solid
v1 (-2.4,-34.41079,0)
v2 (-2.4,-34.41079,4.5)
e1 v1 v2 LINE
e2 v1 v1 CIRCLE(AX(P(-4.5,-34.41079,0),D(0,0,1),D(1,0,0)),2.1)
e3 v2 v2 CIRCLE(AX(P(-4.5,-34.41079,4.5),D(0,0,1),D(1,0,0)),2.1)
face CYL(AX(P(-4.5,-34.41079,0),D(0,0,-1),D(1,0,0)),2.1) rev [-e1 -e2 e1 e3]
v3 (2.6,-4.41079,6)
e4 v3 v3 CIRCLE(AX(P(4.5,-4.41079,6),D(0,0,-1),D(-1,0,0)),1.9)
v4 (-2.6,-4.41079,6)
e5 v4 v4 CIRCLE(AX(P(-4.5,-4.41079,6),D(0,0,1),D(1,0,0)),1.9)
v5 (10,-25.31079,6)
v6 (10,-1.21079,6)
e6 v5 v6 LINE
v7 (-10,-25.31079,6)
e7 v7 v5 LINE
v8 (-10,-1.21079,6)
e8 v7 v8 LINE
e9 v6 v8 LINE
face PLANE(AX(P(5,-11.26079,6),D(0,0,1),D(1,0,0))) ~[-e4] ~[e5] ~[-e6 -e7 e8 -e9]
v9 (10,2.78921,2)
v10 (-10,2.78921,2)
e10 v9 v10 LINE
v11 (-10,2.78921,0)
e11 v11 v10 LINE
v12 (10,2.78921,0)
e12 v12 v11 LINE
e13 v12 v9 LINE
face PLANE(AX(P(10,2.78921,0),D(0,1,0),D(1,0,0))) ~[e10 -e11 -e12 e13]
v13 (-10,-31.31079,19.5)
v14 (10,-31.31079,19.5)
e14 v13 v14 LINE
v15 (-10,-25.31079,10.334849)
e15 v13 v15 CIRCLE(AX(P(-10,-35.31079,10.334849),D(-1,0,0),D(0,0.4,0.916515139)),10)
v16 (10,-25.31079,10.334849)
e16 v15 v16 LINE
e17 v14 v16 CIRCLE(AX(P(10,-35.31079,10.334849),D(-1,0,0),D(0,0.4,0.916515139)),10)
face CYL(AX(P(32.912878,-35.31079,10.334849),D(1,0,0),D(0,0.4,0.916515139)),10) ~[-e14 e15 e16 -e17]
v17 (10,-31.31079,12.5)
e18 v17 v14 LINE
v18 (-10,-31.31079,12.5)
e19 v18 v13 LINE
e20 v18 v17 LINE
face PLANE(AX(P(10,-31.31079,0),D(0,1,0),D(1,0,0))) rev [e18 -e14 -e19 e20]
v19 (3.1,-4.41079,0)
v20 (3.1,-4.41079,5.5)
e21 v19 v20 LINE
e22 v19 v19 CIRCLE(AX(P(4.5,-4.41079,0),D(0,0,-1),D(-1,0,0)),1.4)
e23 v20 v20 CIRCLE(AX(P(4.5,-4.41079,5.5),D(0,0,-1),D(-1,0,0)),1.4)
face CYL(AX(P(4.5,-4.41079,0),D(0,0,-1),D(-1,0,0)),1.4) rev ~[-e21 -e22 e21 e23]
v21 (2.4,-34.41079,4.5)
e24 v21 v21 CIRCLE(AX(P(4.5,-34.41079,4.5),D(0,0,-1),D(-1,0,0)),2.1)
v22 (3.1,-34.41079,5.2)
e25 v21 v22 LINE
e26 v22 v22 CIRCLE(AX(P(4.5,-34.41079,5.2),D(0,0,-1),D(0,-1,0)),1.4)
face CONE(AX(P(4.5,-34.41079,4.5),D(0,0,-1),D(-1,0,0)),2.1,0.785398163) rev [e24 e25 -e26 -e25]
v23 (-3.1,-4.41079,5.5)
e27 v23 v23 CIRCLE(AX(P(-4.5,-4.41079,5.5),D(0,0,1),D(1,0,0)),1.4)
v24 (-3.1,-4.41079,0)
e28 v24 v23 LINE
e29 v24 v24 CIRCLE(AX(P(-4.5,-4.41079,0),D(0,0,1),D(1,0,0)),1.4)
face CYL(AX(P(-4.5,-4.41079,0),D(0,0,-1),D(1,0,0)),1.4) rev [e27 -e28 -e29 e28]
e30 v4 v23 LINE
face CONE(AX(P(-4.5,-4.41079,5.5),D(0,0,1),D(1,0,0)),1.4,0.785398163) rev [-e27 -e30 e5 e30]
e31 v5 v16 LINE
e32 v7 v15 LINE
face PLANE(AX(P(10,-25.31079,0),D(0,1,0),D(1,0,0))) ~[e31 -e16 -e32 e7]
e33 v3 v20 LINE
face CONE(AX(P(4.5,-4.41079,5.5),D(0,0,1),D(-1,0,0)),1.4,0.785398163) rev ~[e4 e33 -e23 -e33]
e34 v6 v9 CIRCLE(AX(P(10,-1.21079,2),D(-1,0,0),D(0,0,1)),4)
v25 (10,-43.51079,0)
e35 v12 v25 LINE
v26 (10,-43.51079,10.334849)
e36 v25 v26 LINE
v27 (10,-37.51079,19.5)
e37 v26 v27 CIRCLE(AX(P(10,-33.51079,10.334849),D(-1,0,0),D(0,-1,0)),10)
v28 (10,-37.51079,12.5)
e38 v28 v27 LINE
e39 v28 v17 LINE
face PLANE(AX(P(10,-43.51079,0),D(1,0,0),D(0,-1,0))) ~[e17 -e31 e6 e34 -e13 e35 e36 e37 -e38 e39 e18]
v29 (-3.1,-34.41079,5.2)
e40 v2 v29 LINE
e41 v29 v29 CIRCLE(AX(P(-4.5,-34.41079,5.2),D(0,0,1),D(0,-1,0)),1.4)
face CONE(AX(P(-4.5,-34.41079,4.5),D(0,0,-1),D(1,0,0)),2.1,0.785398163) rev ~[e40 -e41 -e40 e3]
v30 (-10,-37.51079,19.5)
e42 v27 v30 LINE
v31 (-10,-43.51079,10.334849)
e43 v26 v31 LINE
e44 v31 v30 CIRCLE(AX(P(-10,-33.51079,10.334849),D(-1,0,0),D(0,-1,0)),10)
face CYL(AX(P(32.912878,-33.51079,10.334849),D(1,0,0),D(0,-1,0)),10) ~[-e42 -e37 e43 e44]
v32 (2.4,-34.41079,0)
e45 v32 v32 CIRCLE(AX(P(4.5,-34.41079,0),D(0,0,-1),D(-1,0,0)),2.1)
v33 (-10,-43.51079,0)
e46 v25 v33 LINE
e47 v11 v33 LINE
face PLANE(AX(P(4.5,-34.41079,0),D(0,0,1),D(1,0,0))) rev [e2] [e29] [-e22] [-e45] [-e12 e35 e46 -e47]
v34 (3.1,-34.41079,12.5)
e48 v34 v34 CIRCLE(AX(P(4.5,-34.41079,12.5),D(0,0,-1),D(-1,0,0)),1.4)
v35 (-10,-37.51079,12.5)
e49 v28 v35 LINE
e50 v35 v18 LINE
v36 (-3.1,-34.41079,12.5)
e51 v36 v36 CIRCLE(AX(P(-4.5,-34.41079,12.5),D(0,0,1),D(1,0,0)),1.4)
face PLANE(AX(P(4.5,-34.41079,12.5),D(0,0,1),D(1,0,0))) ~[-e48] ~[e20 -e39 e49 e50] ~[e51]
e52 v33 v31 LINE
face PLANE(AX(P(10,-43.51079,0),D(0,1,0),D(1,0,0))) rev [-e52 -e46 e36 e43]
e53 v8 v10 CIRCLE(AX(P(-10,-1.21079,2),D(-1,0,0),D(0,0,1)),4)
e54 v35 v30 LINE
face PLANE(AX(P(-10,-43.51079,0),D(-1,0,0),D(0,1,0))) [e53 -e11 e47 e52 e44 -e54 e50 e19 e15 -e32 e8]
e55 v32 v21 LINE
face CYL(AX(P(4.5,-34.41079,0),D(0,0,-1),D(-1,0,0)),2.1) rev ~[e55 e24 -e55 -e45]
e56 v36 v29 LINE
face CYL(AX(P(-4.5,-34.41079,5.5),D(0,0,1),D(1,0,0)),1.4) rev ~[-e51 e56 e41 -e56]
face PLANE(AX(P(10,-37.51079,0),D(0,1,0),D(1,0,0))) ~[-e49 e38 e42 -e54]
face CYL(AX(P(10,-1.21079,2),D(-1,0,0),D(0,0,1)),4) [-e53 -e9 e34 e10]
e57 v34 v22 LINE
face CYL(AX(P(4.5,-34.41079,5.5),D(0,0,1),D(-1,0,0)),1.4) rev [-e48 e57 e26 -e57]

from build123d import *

# Parameters (mm, degrees)
F0_W        = 10
F0_H        = 28.1
F0_R        = 1.4
F1_DEPTH    = 6
F0_H_2      = 6
F2_DEPTH    = 19.5
F0_H_3      = 6.2
F0_R_2      = 2.1
F3_DEPTH    = 12.5
F4_DEPTH    = 19.5
F5_DEPTH    = 12.5
F6_DEPTH    = 6.5
F7_T1_DEPTH = 55.8257569496
F8_S5_R     = 1.4
F8_T6_DEPTH = 5
F9_R        = 4
F10_SIZE    = 0.5


# Not quite as in the source:
# - a fillet or chamfer that OpenCascade refuses, or shapes differently, is made with other operations: its cross-section is extruded or revolved along the edge and cut away or added


with BuildPart() as f1:
    # F0 (on Top) → F1 (new body)
    with BuildSketch(Plane.XY):
        with Locations((-5, -11.2607904853)):
            Rectangle(F0_W, F0_H)
        with Locations((-4.5, -4.4107904853)):
            Circle(F0_R, mode=Mode.SUBTRACT)
    extrude(amount=F1_DEPTH)

    # F0 (on Top) → F2 (join)
    with BuildSketch(Plane.XY):
        with Locations((-5, -28.3107904853)):
            Rectangle(F0_W, F0_H_2)
    extrude(amount=F2_DEPTH)

    # F0 (on Top) → F3 (join)
    with BuildSketch(Plane.XY):
        with Locations((-5, -34.4107904853)):
            Rectangle(F0_W, F0_H_3)
        with Locations((-4.5, -34.4107904853)):
            Circle(F0_R_2, mode=Mode.SUBTRACT)
    extrude(amount=F3_DEPTH)

    # F0 (on Top) → F4 (join)
    with BuildSketch(Plane.XY):
        with Locations((-5, -40.5107904853)):
            Rectangle(F0_W, F0_H_2)
    extrude(amount=F4_DEPTH)

    # F0 (on Top) → F5 (join)
    with BuildSketch(Plane.XY):
        with Locations((-4.5, -34.4107904853)):
            Circle(F0_R_2)
        with Locations((-4.5, -34.4107904853)):
            Circle(F0_R, mode=Mode.SUBTRACT)
    extrude(amount=F5_DEPTH)

    # F0 (on Top) → F6 (cut)
    with BuildSketch(Plane.XY):
        with Locations((-4.5, -34.4107904853)):
            Circle(F0_R_2)
        with Locations((-4.5, -34.4107904853)):
            Circle(F0_R, mode=Mode.SUBTRACT)
    extrude(amount=F6_DEPTH, mode=Mode.SUBTRACT)

    # F7: fillet of radius 10 on 2 edges, made by hand

    # F7_s2 → F7_t1 (cut)
    with BuildSketch(Plane.YZ.offset(-32.9128784748)):
        with BuildLine():
            ThreePointArc((-31.3107904853, 19.5), (-26.9441902199, 15.8120741851), (-25.3107904853, 10.3348486101))
            Line((-25.3107904853, 10.3348486101), (-25.3107904853, 19.5))
            Line((-25.3107904853, 19.5), (-31.3107904853, 19.5))
        make_face()
        with BuildLine():
            ThreePointArc((-43.5107904853, 10.3348486101), (-41.8773907506, 15.8120741851), (-37.5107904853, 19.5))
            Line((-37.5107904853, 19.5), (-43.5107904853, 19.5))
            Line((-43.5107904853, 19.5), (-43.5107904853, 10.3348486101))
        make_face()
    extrude(amount=F7_T1_DEPTH, mode=Mode.SUBTRACT)

    # F8: chamfer of 2 on 1 edges, made by hand


with BuildPart() as f8_tool2:
    # F8_s3 → F8_t4 (revolve)
    with BuildSketch(Plane.XZ.offset(34.4107904853)):
        Polygon((-2.4, 4.5), (-4.4, 6.5), (-2.4, 6.5), align=None)
    revolve(axis=Axis((-4.5, -34.4107904853, 6.5), (0, 0, 1)))

    # F8_s5 → F8_t6 (cut, symmetric)
    with BuildSketch(Plane.XY.offset(5.5)):
        with Locations((-4.5, -34.4107904853)):
            Circle(F8_S5_R)
    extrude(amount=F8_T6_DEPTH, both=True, mode=Mode.SUBTRACT)


with BuildPart() as f1_1:
    add(f1.part)

    # F8_t1: union F8_tool2
    add(f8_tool2.part)

    # F9
    f9_edges = [f1_1.edges().sort_by_distance(p)[0] for p in [
        (-5, 2.78921, 6),
    ]]
    fillet(f9_edges, radius=F9_R)

    # F10
    f10_edges = [f1_1.edges().sort_by_distance(p)[0] for p in [
        (-5.9, -4.41079, 6),
    ]]
    chamfer(f10_edges, length=F10_SIZE)

    # F11: F1 across plane


with BuildPart() as f1_2:
    add(f1_1.part)
    add(f1_1.part.mirror(Plane.YZ))


solid = f1_2.part
